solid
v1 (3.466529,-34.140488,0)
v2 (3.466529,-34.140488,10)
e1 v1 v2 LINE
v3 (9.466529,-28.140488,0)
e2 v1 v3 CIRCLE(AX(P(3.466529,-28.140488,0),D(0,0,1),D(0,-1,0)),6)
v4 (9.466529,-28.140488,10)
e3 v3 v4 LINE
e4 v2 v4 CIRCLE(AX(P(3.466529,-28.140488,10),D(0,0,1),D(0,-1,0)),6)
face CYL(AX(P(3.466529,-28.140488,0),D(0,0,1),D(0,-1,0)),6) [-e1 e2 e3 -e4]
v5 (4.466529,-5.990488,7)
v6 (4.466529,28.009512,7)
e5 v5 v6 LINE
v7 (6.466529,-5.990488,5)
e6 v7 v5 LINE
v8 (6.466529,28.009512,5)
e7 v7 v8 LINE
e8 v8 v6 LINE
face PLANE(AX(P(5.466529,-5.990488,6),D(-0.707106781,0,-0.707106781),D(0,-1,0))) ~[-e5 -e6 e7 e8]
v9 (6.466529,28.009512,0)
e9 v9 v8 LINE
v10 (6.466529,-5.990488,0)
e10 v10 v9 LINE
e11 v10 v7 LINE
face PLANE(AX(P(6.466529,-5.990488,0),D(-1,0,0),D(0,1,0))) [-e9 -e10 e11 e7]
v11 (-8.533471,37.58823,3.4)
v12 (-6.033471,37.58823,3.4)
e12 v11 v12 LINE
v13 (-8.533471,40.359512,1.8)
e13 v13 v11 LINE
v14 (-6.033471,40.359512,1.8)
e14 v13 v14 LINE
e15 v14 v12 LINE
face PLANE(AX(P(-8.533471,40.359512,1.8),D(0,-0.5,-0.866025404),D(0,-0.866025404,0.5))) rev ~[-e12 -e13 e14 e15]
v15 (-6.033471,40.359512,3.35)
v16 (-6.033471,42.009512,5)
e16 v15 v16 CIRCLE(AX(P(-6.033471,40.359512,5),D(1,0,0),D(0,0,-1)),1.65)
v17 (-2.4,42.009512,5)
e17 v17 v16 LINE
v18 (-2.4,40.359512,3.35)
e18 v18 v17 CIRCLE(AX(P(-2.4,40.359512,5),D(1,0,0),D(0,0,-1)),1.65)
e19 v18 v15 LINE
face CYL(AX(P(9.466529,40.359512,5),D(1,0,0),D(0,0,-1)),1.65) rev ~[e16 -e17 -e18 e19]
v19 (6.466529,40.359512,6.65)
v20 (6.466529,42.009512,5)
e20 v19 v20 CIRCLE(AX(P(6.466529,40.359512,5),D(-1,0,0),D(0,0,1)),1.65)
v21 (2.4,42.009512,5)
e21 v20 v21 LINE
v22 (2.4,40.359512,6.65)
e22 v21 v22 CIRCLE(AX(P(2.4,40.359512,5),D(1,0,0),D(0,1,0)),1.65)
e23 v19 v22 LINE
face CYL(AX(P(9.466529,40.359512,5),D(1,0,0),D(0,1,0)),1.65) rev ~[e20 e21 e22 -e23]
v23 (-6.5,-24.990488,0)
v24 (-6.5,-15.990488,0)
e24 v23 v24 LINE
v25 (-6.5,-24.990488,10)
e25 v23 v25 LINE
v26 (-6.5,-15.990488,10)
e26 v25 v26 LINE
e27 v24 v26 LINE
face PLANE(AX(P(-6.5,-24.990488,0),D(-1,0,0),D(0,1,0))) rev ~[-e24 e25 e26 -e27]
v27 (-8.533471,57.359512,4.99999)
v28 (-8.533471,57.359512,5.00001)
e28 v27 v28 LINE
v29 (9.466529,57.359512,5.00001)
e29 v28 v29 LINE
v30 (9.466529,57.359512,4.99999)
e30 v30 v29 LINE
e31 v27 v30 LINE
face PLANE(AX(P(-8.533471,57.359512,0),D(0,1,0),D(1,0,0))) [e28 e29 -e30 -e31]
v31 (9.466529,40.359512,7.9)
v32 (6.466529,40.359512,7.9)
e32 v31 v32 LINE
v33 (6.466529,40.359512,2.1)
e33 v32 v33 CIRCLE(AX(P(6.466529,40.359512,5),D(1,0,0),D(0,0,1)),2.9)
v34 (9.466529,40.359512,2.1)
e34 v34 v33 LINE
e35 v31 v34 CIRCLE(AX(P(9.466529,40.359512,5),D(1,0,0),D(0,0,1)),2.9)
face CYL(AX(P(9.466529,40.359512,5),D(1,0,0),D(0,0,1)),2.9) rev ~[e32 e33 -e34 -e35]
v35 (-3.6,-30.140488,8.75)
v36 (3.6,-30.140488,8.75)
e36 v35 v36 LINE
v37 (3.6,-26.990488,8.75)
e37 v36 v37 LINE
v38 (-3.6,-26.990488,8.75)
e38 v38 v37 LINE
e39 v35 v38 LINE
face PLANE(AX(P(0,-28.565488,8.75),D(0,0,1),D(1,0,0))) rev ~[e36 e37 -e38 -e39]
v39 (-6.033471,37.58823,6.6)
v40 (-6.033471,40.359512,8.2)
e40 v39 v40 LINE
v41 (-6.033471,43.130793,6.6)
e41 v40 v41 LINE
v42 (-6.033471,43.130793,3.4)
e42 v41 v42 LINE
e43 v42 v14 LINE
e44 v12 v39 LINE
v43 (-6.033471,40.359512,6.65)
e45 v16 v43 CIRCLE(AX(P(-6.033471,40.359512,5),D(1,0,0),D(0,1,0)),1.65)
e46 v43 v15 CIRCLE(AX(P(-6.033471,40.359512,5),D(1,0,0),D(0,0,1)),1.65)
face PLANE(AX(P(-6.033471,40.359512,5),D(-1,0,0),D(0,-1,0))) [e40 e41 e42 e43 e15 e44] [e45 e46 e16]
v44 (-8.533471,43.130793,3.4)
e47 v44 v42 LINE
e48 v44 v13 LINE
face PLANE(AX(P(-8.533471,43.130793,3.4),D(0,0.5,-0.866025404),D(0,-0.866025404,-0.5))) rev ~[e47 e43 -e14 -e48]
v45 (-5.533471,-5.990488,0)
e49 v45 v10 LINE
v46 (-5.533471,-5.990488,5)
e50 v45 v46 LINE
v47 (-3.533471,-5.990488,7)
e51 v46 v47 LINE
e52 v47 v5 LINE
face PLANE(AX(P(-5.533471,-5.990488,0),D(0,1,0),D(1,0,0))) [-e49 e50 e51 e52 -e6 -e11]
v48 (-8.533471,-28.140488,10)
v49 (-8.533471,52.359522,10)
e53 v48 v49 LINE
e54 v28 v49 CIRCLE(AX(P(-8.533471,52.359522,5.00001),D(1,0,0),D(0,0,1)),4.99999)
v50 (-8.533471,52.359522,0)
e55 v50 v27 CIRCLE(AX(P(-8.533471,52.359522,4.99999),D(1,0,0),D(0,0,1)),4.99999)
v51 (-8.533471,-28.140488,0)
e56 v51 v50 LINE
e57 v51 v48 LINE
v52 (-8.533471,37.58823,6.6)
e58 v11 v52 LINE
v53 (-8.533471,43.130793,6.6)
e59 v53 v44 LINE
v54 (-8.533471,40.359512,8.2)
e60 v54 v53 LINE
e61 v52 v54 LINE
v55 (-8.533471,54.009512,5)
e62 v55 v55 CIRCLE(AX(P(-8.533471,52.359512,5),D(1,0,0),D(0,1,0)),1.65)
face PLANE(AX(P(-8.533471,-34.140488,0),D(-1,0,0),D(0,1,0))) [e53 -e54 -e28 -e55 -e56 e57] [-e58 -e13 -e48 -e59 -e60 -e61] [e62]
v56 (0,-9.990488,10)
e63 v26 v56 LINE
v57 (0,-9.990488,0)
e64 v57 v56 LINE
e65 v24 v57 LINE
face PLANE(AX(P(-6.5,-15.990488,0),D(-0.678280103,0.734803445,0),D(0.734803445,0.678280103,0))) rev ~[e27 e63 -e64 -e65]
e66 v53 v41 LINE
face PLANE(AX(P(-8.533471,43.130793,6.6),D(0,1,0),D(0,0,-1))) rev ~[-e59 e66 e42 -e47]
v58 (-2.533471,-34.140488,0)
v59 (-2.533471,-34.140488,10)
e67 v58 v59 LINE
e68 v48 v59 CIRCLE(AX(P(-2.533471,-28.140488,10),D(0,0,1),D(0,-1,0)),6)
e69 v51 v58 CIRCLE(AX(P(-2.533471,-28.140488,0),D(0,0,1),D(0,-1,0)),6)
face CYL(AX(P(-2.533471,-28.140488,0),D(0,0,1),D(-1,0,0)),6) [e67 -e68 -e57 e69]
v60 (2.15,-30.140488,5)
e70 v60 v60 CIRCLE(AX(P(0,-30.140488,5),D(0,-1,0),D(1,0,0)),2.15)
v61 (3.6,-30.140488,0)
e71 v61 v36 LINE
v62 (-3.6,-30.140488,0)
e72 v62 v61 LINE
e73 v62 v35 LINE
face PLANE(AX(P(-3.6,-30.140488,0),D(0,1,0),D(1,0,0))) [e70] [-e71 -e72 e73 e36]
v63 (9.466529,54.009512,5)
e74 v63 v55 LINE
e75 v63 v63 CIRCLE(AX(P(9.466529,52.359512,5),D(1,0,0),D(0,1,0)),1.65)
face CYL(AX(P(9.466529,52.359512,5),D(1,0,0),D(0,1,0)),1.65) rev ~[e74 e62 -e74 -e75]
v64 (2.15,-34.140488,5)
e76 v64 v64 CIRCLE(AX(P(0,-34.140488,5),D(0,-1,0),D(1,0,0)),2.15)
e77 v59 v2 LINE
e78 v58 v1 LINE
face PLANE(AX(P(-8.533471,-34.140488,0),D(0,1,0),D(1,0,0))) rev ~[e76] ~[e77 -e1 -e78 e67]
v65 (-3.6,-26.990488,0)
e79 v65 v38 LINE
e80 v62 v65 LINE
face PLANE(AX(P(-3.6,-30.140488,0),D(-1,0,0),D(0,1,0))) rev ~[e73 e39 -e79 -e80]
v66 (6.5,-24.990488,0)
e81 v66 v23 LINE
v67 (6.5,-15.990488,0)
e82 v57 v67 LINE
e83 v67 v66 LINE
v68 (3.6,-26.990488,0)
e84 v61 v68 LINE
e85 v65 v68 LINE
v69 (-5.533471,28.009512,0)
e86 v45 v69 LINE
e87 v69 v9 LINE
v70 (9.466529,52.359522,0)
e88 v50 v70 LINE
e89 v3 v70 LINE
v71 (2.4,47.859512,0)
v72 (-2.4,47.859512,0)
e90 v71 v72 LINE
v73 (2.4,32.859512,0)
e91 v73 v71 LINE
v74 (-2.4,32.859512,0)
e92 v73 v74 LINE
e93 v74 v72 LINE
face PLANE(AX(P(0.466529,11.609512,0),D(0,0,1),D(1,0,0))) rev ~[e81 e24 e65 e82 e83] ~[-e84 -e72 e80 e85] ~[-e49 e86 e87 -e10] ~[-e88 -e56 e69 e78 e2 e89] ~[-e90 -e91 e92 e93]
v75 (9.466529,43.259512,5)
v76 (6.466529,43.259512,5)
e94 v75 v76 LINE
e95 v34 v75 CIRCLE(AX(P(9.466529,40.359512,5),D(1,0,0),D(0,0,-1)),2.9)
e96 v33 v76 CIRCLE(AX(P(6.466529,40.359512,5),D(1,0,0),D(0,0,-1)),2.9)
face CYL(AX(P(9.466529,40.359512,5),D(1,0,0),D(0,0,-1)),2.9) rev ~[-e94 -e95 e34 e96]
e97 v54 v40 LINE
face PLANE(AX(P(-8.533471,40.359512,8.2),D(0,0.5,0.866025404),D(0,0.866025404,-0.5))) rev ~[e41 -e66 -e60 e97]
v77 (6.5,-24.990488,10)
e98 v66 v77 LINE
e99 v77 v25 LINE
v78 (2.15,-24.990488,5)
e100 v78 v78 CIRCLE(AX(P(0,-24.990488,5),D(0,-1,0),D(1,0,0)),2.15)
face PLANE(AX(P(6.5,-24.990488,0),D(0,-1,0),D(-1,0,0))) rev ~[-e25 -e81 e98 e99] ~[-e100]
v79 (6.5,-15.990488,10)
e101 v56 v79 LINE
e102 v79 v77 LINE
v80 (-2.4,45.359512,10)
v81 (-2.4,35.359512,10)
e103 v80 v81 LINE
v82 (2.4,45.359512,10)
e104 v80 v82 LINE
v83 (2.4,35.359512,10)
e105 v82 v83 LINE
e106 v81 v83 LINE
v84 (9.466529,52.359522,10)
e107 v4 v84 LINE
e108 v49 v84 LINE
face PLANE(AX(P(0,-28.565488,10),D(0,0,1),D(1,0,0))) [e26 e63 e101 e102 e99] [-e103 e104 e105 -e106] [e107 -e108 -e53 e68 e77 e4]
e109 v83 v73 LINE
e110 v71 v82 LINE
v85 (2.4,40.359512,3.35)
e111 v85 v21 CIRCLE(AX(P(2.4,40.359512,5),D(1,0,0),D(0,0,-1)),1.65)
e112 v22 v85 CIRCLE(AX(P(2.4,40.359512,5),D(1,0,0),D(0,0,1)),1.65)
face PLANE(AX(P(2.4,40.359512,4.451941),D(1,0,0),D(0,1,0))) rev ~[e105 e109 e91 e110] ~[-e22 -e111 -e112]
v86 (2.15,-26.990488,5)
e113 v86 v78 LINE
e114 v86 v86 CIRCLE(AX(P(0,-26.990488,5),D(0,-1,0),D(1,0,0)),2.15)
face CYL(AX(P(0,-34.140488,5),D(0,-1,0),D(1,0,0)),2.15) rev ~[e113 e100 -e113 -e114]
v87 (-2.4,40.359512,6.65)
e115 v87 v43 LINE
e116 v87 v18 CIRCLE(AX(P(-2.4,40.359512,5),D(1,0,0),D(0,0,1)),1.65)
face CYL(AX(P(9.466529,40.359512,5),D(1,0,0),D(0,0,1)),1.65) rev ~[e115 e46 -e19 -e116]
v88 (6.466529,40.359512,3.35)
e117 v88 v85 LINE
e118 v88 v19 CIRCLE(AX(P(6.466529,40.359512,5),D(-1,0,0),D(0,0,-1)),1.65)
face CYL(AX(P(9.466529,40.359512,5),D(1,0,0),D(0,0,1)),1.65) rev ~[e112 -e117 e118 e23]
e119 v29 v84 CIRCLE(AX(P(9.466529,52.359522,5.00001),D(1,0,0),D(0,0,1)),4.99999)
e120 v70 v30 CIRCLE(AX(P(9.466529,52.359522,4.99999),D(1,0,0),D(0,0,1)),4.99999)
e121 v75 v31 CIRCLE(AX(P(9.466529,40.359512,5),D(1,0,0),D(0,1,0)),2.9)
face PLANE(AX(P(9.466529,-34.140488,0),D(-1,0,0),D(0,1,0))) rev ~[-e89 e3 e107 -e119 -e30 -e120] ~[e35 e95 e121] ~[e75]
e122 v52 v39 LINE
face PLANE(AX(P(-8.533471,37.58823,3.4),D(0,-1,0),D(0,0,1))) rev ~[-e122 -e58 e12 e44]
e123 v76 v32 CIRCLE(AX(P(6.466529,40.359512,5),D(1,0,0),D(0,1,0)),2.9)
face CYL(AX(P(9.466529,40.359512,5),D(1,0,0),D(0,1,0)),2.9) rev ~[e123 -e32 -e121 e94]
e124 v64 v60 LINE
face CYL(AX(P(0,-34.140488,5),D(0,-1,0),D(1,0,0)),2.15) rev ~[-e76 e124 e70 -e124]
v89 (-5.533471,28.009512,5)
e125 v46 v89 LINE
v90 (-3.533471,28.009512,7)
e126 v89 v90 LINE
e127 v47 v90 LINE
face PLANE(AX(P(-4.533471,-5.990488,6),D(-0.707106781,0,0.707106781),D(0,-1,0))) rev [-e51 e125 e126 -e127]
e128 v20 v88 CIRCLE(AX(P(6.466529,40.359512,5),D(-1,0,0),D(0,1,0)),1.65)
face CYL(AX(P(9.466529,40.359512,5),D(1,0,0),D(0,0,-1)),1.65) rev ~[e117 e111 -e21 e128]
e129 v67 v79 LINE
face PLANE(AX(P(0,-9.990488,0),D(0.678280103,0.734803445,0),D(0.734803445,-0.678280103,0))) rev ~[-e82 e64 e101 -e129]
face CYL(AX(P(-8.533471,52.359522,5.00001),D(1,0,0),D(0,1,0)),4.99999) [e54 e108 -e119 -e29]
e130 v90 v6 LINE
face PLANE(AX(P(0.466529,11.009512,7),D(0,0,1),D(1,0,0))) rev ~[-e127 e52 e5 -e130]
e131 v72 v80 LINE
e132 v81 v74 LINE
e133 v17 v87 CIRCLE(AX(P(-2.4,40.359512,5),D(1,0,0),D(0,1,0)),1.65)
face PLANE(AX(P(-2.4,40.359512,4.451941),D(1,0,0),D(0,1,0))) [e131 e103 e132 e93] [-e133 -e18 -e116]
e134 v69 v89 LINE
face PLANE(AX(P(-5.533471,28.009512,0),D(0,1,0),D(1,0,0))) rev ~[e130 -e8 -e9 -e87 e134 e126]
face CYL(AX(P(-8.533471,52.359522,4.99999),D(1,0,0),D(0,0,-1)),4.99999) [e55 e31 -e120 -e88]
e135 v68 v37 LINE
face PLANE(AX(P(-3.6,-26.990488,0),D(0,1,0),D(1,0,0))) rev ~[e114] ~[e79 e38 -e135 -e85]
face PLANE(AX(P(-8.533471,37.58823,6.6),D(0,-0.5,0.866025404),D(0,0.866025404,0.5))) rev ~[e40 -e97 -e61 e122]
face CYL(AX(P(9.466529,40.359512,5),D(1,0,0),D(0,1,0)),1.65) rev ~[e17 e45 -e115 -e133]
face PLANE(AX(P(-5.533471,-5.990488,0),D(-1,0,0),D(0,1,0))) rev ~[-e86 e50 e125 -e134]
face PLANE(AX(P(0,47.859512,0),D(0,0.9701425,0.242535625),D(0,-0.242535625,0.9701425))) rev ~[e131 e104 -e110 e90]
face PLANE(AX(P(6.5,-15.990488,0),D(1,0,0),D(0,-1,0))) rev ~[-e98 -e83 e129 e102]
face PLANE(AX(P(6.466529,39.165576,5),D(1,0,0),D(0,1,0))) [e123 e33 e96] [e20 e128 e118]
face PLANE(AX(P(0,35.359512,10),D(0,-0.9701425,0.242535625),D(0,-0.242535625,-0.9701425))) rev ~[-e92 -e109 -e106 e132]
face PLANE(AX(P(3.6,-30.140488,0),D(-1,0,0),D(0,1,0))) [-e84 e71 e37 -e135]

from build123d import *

# Parameters (mm, degrees)
F0_W      = 18
F0_H      = 91.5
F0_W_2    = 7.2
F0_H_2    = 3.15
F0_W_3    = 12
F0_H_3    = 34
F1_DEPTH  = 10
F2_R      = 6
F4_DEPTH  = 7
F5_SIZE   = 2
F6_R      = 1.65
F7_DEPTH  = 25
F8_DEPTH  = 3
F10_R     = 4.99999
F12_DEPTH = 2.4
F15_DEPTH = 2.5
F17_R     = 2.15
F18_DEPTH = 20
F20_W     = 7.2
F20_H     = 3.15
F21_DEPTH = 1.25


# Not quite as in the source:
# - a fillet or chamfer is up to 0.001 mm smaller than in the source, because OpenCascade refuses the exact size


with BuildPart() as f1:
    # F0 (on Top) → F1 (new body)
    with BuildSketch(Plane.XY):
        with Locations((0.4665288143, 11.6095117688)):
            Rectangle(F0_W, F0_H)
        with Locations((0, -28.5654882312)):
            Rectangle(F0_W_2, F0_H_2, mode=Mode.SUBTRACT)
        Polygon((6.5, -24.9904882312), (-6.5, -24.9904882312), (-6.5, -15.9904882312), (0, -9.9904882312), (6.5, -15.9904882312), align=None, mode=Mode.SUBTRACT)
        with Locations((0.4665288143, 11.0095117688)):
            Rectangle(F0_W_3, F0_H_3, mode=Mode.SUBTRACT)
        with Locations((0.4665288143, 11.0095117688)):
            Rectangle(F0_W_3, F0_H_3)
    extrude(amount=F1_DEPTH)

    # F2
    f2_edges = [f1.edges().sort_by_distance(p)[0] for p in [
        (9.466529, -34.140488, 5),
        (-8.533471, -34.140488, 5),
    ]]
    fillet(f2_edges, radius=F2_R)

    # F0 (on Top) → F4 (cut)
    with BuildSketch(Plane.XY):
        with Locations((0.4665288143, 11.0095117688)):
            Rectangle(F0_W_3, F0_H_3)
    extrude(amount=F4_DEPTH, mode=Mode.SUBTRACT)

    # F5
    f5_edges = [f1.edges().sort_by_distance(p)[0] for p in [
        (6.466529, 11.009512, 7),
        (-5.533471, 11.009512, 7),
    ]]
    chamfer(f5_edges, length=F5_SIZE)

    # F6 (on offset) → F7 (cut)
    with BuildSketch(Plane.YZ.offset(9.4665288143)):
        with BuildLine():
            Line((40.3595117688, 3.35), (40.3595117688, 6.65))
            ThreePointArc((40.3595117688, 6.65), (38.7095117688, 5), (40.3595117688, 3.35))
        make_face()
        with BuildLine():
            ThreePointArc((42.0095117688, 5), (41.5262379578, 6.166726189), (40.3595117688, 6.65))
            Line((40.3595117688, 6.65), (40.3595117688, 3.35))
            ThreePointArc((40.3595117688, 3.35), (41.5262379578, 3.833273811), (42.0095117688, 5))
        make_face()
        with Locations((52.3595117688, 5)):
            Circle(F6_R)
    extrude(amount=-F7_DEPTH, mode=Mode.SUBTRACT)

    # F6 (on offset) → F8 (cut)
    with BuildSketch(Plane.YZ.offset(9.4665288143)):
        with BuildLine():
            Line((40.3595117688, 6.65), (40.3595117688, 7.9))
            ThreePointArc((40.3595117688, 7.9), (37.4595117688, 5), (40.3595117688, 2.1))
            Line((40.3595117688, 2.1), (40.3595117688, 3.35))
            ThreePointArc((40.3595117688, 3.35), (38.7095117688, 5), (40.3595117688, 6.65))
        make_face()
        with BuildLine():
            ThreePointArc((43.2595117688, 5), (42.4101214343, 7.0506096654), (40.3595117688, 7.9))
            Line((40.3595117688, 7.9), (40.3595117688, 6.65))
            ThreePointArc((40.3595117688, 6.65), (41.5262379578, 6.166726189), (42.0095117688, 5))
            ThreePointArc((42.0095117688, 5), (41.5262379578, 3.833273811), (40.3595117688, 3.35))
            Line((40.3595117688, 3.35), (40.3595117688, 2.1))
            ThreePointArc((40.3595117688, 2.1), (42.4101214343, 2.9493903346), (43.2595117688, 5))
        make_face()
    extrude(amount=-F8_DEPTH, mode=Mode.SUBTRACT)

    # F10 (radius 5 in the source; OpenCascade refuses exactly that, so slightly less here)
    f10_edges = [f1.edges().sort_by_distance(p)[0] for p in [
        (0.466529, 57.359512, 0),
        (0.466529, 57.359512, 10),
    ]]
    fillet(f10_edges, radius=F10_R)

    # F11 (on offset) → F12 (cut, symmetric)
    with BuildSketch(Plane.YZ):
        Polygon((47.8595117688, 0), (45.3595117688, 10), (35.3595117688, 10), (32.8595117688, 0), align=None)
    extrude(amount=F12_DEPTH, both=True, mode=Mode.SUBTRACT)

    # F14 (on offset) → F15 (cut)
    with BuildSketch(Plane(origin=(-8.5334711857, 0, 0), x_dir=(0, -1, 0), z_dir=(-1, 0, 0))):
        Polygon((-37.5882304767, 3.4), (-37.5882304767, 6.6), (-40.3595117688, 8.2), (-43.1307930609, 6.6), (-43.1307930609, 3.4), (-40.3595117688, 1.8), align=None)
    extrude(amount=-F15_DEPTH, mode=Mode.SUBTRACT)

    # F17 (on offset) → F18 (cut)
    with BuildSketch(Plane.XZ.offset(34.1404882312)):
        with Locations((0, 5)):
            Circle(F17_R)
    extrude(amount=-F18_DEPTH, mode=Mode.SUBTRACT)

    # F20 (on offset) → F21 (join)
    with BuildSketch(Plane.XY.offset(10)):
        with Locations((0, -28.5654882312)):
            Rectangle(F20_W, F20_H)
    extrude(amount=-F21_DEPTH)


solid = f1.part
